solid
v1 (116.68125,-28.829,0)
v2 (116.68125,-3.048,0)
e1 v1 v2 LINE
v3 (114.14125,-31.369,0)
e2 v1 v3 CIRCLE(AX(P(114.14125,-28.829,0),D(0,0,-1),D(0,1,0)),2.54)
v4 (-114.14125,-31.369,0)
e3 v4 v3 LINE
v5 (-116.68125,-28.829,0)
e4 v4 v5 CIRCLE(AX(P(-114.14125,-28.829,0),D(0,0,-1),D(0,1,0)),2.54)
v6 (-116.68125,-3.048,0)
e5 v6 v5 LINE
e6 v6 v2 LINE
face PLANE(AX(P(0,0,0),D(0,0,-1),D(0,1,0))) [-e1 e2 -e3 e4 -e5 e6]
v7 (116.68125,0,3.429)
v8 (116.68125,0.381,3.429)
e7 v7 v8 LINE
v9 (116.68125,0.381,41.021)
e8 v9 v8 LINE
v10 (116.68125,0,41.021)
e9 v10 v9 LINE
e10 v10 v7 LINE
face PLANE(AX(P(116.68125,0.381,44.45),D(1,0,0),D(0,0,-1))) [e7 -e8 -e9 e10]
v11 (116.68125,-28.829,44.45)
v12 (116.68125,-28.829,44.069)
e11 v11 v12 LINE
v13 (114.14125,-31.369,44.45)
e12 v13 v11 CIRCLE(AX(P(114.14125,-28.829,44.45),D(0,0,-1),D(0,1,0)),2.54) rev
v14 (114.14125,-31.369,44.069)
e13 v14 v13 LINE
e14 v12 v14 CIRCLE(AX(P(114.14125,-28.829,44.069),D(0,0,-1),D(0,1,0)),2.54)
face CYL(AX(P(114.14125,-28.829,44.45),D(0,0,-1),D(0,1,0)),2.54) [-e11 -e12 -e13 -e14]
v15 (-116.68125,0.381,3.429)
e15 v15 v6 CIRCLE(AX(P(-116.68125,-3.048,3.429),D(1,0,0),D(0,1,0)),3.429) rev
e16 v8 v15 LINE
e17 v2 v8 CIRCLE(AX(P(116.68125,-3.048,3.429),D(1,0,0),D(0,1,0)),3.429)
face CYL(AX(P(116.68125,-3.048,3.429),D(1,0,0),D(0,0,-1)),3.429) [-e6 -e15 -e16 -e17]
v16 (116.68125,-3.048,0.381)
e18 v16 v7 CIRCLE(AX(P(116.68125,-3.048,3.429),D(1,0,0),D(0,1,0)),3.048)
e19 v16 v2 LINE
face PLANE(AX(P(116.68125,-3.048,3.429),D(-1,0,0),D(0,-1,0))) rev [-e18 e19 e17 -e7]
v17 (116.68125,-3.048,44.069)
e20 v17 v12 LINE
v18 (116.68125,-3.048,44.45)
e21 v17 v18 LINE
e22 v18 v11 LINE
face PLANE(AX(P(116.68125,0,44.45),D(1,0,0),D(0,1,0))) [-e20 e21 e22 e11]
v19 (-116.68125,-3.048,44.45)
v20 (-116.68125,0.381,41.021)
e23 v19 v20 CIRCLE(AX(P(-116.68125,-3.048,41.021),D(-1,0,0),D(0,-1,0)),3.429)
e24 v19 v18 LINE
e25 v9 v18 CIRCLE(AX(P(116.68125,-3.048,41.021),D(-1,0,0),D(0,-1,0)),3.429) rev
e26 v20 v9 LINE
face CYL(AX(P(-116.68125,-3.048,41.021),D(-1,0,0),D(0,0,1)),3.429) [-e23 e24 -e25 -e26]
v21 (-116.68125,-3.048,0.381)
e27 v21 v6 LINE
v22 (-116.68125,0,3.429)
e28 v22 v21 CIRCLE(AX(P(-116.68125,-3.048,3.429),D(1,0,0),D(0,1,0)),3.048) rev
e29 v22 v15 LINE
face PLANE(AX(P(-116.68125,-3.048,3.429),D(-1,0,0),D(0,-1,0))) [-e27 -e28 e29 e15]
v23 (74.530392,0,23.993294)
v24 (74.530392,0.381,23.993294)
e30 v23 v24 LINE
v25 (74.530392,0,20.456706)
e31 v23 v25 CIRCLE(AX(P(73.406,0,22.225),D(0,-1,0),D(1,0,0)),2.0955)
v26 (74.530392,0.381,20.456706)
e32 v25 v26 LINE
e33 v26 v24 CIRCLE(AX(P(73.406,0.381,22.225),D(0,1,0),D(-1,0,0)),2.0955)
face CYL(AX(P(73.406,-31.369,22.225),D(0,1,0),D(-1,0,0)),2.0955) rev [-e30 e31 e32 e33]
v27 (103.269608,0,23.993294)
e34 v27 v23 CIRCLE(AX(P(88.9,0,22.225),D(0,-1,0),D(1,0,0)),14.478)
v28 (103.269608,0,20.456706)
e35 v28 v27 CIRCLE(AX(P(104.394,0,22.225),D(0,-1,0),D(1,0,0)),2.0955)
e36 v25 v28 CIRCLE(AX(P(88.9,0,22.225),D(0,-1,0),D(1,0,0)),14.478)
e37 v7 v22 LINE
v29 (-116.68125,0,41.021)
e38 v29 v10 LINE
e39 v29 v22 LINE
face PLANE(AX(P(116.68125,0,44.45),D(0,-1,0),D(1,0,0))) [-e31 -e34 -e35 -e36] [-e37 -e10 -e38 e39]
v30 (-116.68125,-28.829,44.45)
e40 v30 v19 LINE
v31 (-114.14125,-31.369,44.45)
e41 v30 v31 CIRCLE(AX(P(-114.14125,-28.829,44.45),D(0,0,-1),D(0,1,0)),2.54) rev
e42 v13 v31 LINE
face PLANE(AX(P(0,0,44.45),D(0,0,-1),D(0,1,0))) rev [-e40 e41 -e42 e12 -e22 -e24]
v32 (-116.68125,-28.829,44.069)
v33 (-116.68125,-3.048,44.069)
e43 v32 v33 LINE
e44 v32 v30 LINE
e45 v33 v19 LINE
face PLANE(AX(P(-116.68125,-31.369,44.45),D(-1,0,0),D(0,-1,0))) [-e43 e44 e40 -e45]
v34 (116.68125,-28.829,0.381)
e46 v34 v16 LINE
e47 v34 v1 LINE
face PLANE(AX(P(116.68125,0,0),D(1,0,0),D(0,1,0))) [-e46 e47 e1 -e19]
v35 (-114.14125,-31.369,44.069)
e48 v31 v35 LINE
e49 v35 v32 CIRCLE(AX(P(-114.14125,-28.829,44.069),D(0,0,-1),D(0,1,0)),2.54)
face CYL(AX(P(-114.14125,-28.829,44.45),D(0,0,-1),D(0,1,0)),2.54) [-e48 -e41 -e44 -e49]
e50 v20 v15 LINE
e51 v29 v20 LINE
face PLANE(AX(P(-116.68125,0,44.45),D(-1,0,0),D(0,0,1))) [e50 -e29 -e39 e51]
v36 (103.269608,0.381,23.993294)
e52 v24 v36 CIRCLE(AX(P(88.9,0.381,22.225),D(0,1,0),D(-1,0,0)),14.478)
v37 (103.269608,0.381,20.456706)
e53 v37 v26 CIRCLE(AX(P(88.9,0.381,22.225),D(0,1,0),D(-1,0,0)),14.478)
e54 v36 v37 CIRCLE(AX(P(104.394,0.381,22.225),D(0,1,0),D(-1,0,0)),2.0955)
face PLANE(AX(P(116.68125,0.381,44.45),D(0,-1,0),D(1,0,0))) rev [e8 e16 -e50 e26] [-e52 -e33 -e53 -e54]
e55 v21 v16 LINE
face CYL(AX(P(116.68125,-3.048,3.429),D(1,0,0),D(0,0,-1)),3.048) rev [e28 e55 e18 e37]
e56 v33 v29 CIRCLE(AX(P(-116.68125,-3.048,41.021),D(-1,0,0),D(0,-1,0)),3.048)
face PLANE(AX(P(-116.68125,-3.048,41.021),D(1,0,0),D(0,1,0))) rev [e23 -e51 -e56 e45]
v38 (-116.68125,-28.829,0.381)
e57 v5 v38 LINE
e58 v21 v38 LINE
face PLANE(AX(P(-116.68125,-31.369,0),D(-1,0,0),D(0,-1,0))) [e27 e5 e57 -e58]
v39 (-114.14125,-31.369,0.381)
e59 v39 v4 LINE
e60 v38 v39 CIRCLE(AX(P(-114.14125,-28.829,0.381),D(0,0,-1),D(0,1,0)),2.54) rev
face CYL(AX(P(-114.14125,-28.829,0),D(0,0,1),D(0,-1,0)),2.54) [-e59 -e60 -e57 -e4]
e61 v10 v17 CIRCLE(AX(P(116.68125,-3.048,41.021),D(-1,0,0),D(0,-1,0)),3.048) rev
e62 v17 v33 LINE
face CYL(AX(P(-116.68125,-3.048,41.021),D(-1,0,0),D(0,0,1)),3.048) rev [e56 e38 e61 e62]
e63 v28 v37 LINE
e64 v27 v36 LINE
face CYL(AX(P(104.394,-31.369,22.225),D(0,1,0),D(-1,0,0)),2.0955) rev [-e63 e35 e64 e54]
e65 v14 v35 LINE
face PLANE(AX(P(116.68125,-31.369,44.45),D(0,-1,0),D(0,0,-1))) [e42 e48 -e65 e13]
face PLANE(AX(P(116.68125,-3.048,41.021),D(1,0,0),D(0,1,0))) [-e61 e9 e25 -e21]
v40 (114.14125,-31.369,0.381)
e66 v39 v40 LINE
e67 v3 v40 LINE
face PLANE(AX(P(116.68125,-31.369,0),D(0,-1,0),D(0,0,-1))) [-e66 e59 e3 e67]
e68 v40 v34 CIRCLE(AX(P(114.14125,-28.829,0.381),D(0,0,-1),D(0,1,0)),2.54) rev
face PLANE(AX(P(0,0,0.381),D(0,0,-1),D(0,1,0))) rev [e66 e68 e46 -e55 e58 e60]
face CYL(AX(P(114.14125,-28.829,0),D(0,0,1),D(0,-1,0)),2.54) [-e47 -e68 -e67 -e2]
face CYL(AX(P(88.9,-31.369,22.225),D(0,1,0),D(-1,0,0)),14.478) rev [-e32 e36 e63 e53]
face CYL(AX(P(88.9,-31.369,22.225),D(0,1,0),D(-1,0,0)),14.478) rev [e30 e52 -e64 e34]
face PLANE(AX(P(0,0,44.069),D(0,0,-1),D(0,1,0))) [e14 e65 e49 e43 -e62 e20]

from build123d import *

# Parameters (mm, degrees)
SKETCH1_W                      = 233.3625
SKETCH1_H                      = 0.381
BASE_FLANGE1_DEPTH             = 44.45
EDGE_FLANGE1_STRIP_W           = 7.62
EDGE_FLANGE1_STRIP_H           = 0.381
EDGE_FLANGE1_STRIP_CUT_DEPTH   = 233.3625
EDGE_FLANGE1_STRIP_2_W         = 7.62
EDGE_FLANGE1_STRIP_2_H         = 0.381
EDGE_FLANGE1_STRIP_CUT_2_DEPTH = 233.3625
EDGE_FLANGE1_DEPTH             = 233.3625
EDGE_FLANGE1_BEND_DEPTH        = 233.3625
CUT_EXTRUDE1_DEPTH             = 129.834696808
FILLET1_R                      = 2.54


# Sheet-metal steps are written as plain solids
with BuildPart() as part:
    # Sketch1 → Base-Flange1 (new body)
    with BuildSketch(Plane.XY):
        with Locations((0, 0.1905)):
            Rectangle(SKETCH1_W, SKETCH1_H)
    extrude(amount=BASE_FLANGE1_DEPTH)

    # Edge-Flange1 strip (across the edge) → Edge-Flange1 strip cut (cut)
    with BuildSketch(Plane(origin=(-116.68125, 0, 0), x_dir=(0, 0, 1), z_dir=(1, 0, 0))):
        with Locations((-0.381, -0.1905)):
            Rectangle(EDGE_FLANGE1_STRIP_W, EDGE_FLANGE1_STRIP_H)
    extrude(amount=EDGE_FLANGE1_STRIP_CUT_DEPTH, mode=Mode.SUBTRACT)

    # Edge-Flange1 strip 2 (across the edge) → Edge-Flange1 strip cut 2 (cut)
    with BuildSketch(Plane(origin=(116.68125, 0, 44.45), x_dir=(0, 0, -1), z_dir=(-1, 0, 0))):
        with Locations((-0.381, -0.1905)):
            Rectangle(EDGE_FLANGE1_STRIP_2_W, EDGE_FLANGE1_STRIP_2_H)
    extrude(amount=EDGE_FLANGE1_STRIP_CUT_2_DEPTH, mode=Mode.SUBTRACT)

    # Edge-Flange1 section (across the edge) → Edge-Flange1 (add)
    with BuildSketch(Plane(origin=(-116.68125, 0, 0), x_dir=(0, 0, 1), z_dir=(1, 0, 0))):
        with BuildLine():
            Line((0, 3.048), (0, 31.369))
            Line((0, 31.369), (0.381, 31.369))
            Line((0.381, 31.369), (0.381, 3.048))
            ThreePointArc((0.381, 3.048), (1.273738531, 0.892738531), (3.429, 0))
            Line((3.429, 0), (3.429, -0.381))
            ThreePointArc((3.429, -0.381), (1.004330847, 0.623330847), (0, 3.048))
        make_face()
    extrude(amount=EDGE_FLANGE1_DEPTH)

    # Edge-Flange1 section 2 (across the edge) → Edge-Flange1 bend (add)
    with BuildSketch(Plane(origin=(116.68125, 0, 44.45), x_dir=(0, 0, -1), z_dir=(-1, 0, 0))):
        with BuildLine():
            Line((0, 3.048), (0, 31.369))
            Line((0, 31.369), (0.381, 31.369))
            Line((0.381, 31.369), (0.381, 3.048))
            ThreePointArc((0.381, 3.048), (1.273738531, 0.892738531), (3.429, 0))
            Line((3.429, 0), (3.429, -0.381))
            ThreePointArc((3.429, -0.381), (1.004330847, 0.623330847), (0, 3.048))
        make_face()
    extrude(amount=EDGE_FLANGE1_BEND_DEPTH)

    # Sketch18 → Cut-Extrude1 (cut, through all)
    with BuildSketch(Plane(origin=(0, 0.381, 0), x_dir=(1, 0, 0), z_dir=(0, 1, 0))):
        with BuildLine():
            ThreePointArc((74.530392418, -23.993293511), (88.9, -36.703), (103.269607582, -23.993293511))
            ThreePointArc((103.269607582, -23.993293511), (106.4895, -22.225), (103.269607582, -20.456706489))
            ThreePointArc((103.269607582, -20.456706489), (88.9, -7.747), (74.530392418, -20.456706489))
            ThreePointArc((74.530392418, -20.456706489), (71.3105, -22.225), (74.530392418, -23.993293511))
        make_face()
    extrude(amount=-CUT_EXTRUDE1_DEPTH, mode=Mode.SUBTRACT)

    # Fillet1
    fillet1_edges = [part.edges().sort_by_distance(p)[0] for p in [
        (-116.68125, -31.369, 0.1905),
        (116.68125, -31.369, 0.1905),
        (116.68125, -31.369, 44.2595),
        (-116.68125, -31.369, 44.2595),
    ]]
    fillet(fillet1_edges, radius=FILLET1_R)


solid = part.part
